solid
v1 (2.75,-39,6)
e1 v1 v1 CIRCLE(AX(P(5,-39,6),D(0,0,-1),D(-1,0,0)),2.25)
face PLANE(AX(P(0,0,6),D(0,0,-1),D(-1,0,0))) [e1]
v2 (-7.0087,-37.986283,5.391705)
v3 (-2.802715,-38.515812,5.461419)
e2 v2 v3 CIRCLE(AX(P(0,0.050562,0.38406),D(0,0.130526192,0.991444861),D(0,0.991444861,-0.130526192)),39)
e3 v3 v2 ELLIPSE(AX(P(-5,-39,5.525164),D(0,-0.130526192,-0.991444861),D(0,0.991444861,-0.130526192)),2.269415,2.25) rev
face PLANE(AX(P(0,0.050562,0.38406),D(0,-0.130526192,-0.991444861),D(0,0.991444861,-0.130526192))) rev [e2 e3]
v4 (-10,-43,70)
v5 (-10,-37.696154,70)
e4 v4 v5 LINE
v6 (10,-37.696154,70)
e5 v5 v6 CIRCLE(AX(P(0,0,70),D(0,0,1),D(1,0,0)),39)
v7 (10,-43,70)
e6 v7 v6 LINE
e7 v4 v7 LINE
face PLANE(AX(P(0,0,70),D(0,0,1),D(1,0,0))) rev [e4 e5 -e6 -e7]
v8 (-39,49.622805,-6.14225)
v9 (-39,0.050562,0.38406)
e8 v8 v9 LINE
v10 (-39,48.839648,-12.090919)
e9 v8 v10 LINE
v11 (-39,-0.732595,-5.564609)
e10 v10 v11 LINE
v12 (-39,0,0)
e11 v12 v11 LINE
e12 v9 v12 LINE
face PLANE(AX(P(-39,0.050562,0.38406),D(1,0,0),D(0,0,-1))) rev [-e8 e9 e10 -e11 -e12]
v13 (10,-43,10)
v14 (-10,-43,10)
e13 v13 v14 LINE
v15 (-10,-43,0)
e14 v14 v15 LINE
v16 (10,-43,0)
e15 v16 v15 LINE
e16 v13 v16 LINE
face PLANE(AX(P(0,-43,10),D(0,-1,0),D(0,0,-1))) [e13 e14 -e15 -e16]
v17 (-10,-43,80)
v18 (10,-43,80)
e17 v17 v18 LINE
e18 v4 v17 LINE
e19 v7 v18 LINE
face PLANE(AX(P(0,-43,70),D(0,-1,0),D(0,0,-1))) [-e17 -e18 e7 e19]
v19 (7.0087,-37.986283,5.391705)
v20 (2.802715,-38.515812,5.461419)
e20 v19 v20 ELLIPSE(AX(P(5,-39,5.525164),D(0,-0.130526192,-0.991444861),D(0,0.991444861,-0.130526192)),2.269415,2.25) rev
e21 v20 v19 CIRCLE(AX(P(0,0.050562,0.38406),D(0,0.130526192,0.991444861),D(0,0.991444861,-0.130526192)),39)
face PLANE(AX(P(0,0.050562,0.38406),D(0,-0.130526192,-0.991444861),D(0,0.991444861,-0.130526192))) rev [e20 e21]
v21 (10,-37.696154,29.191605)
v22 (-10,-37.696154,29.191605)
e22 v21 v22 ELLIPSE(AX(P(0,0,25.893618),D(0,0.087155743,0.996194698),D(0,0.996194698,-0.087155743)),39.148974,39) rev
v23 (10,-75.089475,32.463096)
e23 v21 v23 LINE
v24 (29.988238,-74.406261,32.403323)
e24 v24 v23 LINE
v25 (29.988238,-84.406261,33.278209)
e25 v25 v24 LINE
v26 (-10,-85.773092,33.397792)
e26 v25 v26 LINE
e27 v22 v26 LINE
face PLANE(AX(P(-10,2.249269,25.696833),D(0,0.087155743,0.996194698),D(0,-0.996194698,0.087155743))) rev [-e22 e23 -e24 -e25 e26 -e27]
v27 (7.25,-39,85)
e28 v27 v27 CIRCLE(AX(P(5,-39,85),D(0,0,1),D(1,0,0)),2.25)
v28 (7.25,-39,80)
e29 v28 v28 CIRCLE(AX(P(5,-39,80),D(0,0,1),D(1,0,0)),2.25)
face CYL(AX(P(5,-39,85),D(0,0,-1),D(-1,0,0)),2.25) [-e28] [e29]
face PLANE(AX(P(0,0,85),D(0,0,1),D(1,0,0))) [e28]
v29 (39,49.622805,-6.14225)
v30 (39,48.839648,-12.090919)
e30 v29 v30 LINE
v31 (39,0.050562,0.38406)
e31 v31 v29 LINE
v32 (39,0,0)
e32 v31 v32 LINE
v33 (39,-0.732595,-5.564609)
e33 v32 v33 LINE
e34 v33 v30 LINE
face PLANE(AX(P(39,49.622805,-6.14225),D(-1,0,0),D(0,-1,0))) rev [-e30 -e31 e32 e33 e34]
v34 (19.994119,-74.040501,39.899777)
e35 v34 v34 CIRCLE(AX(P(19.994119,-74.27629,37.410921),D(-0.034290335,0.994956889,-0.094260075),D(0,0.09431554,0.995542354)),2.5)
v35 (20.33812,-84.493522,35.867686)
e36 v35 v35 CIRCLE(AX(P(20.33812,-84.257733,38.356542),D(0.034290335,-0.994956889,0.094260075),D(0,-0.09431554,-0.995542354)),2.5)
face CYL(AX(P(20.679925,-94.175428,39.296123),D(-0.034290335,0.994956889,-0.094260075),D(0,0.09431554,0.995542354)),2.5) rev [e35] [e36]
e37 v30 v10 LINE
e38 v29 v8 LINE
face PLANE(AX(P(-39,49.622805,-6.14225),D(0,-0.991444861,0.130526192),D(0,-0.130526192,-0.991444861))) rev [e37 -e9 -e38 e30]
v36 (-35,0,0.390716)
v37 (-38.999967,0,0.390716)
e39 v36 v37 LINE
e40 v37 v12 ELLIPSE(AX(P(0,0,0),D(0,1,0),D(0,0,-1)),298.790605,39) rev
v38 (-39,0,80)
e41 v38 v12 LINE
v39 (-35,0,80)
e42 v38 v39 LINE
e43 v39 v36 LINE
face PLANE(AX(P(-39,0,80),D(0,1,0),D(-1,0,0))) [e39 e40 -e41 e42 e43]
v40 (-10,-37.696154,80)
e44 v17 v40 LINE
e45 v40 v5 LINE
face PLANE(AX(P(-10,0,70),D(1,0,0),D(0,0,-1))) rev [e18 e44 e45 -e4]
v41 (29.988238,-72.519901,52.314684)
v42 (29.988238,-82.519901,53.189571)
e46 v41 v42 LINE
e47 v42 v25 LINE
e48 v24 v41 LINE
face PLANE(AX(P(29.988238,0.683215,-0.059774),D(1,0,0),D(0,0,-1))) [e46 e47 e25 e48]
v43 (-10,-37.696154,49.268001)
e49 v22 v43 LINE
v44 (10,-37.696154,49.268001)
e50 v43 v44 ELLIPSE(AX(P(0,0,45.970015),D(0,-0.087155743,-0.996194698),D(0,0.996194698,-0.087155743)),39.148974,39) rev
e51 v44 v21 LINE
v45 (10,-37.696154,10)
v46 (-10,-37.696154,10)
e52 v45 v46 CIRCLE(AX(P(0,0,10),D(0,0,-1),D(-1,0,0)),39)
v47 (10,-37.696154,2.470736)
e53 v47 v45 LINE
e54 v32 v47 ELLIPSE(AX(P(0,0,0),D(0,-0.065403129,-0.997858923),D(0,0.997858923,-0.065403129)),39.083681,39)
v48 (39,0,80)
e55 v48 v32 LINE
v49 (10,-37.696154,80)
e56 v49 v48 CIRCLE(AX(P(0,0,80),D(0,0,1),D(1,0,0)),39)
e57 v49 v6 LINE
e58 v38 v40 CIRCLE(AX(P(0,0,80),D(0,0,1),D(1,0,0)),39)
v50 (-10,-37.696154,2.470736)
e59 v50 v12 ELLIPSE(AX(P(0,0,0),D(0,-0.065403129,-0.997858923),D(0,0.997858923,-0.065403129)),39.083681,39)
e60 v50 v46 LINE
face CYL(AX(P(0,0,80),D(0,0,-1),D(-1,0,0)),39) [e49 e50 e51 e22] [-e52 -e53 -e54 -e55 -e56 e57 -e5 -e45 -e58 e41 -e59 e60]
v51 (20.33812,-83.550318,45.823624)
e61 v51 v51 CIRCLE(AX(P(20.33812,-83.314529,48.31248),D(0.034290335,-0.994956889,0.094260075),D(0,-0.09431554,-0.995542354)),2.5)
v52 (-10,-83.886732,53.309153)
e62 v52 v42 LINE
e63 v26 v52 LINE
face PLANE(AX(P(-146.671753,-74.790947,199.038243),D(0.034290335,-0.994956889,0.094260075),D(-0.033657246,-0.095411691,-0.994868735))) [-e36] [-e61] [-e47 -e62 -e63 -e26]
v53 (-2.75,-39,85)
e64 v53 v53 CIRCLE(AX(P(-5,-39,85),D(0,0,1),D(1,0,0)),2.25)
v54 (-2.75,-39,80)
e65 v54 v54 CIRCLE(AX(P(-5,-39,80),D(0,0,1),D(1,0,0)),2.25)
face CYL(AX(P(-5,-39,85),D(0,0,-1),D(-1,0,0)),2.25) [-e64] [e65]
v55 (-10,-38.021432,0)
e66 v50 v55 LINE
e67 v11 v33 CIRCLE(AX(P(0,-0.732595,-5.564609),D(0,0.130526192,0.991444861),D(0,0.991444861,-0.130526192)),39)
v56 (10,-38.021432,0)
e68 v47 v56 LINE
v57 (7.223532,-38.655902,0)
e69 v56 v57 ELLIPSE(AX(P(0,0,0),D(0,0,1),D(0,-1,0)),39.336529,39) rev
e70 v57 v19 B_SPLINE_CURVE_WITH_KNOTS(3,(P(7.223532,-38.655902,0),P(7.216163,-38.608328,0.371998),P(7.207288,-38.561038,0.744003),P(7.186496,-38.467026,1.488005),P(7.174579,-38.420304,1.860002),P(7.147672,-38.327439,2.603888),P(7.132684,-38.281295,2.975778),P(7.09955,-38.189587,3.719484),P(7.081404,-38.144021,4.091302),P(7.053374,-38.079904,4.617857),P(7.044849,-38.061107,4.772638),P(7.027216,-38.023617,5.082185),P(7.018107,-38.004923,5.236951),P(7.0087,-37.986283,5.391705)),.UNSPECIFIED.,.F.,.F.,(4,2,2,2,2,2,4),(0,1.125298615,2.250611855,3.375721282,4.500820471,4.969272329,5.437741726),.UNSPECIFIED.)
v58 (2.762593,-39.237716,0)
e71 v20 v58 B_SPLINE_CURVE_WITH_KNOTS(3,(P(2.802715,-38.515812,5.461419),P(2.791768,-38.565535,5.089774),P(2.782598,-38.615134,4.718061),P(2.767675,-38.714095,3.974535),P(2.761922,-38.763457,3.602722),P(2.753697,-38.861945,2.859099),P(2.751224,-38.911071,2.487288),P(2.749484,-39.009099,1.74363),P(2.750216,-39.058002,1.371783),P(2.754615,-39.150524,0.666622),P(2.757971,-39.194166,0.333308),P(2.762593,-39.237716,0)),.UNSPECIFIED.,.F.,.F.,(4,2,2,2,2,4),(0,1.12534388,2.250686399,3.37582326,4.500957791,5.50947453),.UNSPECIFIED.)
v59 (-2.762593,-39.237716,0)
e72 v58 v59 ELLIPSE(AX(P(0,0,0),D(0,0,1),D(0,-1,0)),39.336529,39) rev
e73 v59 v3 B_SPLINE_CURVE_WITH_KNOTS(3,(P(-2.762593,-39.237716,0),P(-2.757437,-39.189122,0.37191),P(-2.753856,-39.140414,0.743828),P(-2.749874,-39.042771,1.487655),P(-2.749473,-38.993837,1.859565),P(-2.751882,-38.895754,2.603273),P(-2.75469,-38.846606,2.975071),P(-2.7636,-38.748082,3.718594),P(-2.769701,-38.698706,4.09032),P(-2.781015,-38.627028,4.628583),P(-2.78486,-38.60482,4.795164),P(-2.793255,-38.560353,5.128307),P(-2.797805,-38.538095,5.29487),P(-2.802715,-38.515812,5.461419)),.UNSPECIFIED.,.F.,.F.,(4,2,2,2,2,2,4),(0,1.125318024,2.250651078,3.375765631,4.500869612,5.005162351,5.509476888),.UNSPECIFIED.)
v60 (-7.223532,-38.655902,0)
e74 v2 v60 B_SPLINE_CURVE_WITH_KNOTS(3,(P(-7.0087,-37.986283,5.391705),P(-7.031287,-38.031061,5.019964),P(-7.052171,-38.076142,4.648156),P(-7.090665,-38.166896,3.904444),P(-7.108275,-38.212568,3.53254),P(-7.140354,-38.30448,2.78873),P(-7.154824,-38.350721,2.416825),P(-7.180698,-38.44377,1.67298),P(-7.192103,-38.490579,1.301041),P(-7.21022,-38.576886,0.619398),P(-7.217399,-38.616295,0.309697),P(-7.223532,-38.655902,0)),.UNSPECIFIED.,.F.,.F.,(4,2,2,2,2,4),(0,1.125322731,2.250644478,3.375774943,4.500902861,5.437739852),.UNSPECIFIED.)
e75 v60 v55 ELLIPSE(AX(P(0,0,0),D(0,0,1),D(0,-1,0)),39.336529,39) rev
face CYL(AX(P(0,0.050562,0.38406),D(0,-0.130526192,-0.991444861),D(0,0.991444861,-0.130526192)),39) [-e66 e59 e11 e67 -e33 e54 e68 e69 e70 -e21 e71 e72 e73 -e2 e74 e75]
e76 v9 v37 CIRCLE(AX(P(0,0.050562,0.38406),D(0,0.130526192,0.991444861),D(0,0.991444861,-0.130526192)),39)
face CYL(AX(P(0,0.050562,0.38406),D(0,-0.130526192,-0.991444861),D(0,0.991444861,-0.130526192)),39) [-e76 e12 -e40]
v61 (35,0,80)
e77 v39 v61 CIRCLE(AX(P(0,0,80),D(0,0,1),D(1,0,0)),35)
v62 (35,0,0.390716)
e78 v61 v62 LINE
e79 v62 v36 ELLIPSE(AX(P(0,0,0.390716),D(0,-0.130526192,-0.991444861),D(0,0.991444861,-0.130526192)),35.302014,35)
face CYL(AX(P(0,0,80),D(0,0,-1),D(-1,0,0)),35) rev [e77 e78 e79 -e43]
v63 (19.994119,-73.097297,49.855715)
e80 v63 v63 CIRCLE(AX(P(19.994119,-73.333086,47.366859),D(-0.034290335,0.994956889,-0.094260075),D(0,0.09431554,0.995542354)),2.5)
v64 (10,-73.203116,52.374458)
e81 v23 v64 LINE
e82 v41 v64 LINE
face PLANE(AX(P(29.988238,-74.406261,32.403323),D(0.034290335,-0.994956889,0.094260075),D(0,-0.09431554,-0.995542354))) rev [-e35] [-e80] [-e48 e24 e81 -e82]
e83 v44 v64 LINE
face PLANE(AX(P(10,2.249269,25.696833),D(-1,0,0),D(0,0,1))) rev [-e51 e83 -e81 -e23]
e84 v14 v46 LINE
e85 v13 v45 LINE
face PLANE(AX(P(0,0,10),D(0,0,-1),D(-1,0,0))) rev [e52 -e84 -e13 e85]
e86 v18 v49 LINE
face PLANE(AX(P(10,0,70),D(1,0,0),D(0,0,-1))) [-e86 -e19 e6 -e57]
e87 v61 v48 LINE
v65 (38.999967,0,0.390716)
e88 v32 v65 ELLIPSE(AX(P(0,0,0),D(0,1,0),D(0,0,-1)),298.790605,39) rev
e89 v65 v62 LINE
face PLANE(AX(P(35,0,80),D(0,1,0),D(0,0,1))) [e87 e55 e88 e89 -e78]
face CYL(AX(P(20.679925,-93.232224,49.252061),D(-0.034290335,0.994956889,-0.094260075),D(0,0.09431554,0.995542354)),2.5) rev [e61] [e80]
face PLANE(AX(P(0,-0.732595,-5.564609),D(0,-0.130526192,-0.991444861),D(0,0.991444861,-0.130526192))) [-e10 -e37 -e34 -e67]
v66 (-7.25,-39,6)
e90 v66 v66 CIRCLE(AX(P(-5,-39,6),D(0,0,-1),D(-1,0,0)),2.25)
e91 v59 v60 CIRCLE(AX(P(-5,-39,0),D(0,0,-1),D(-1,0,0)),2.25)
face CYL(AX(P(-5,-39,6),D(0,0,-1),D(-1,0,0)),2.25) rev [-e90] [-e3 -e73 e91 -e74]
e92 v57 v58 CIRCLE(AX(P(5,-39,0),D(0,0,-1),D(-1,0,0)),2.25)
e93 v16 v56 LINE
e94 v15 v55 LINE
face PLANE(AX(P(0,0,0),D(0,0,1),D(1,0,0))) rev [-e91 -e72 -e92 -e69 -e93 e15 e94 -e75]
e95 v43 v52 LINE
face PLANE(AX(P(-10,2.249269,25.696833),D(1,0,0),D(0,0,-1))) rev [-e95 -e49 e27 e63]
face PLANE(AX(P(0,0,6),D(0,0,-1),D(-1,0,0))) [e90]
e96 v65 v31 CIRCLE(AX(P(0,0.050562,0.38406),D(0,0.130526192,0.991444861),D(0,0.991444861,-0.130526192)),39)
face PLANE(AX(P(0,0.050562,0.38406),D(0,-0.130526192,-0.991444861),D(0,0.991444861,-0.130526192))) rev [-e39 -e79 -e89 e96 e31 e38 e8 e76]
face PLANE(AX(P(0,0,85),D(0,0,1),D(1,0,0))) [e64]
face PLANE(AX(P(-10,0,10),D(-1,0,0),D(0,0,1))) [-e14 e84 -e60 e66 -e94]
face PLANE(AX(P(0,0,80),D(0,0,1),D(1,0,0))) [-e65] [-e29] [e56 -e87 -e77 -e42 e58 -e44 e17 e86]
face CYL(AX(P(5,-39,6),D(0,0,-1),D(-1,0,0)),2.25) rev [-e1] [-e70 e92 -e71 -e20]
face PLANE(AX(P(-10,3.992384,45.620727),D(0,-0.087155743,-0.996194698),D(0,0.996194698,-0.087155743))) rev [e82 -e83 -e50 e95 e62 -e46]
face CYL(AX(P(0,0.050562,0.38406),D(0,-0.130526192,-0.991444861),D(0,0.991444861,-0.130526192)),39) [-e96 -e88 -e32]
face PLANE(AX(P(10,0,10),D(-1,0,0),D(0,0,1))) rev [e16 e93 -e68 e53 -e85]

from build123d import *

# Parameters (mm, degrees)
EXTRUDE_THIN1_DEPTH       = 80
BOSS_EXTRUDE1_START       = -10
BOSS_EXTRUDE1_DEPTH       = 10
SKETCH3_R                 = 2.25
BOSS_EXTRUDE2_DEPTH       = 5
BOSS_EXTRUDE3_DEPTH       = 10
SKETCH5_R                 = 2.25
CUT_EXTRUDE1_DEPTH        = 6
BOSS_EXTRUDE4_REACH       = 104.415
BOSS_EXTRUDE4_END_RADIUS  = 39
SKETCH10_W                = 20
SKETCH10_H                = 20
BOSS_EXTRUDE6_DEPTH       = 6
BOSS_EXTRUDE7_START       = -38.548677333
BOSS_EXTRUDE7_OUTLINE_W   = 20
BOSS_EXTRUDE7_OUTLINE_H   = 20
BOSS_EXTRUDE7_DEPTH       = 38.548677333
BOSS_EXTRUDE7_START_2     = 88.145703723
BOSS_EXTRUDE7_2_OUTLINE_W = 23
BOSS_EXTRUDE7_2_OUTLINE_H = 23
BOSS_EXTRUDE7_2_DEPTH     = 1.854296277
BOSS_EXTRUDE9_DEPTH       = 20
SKETCH16_R                = 2.5
CUT_EXTRUDE2_DEPTH        = 20


with BuildPart() as part:
    # Sketch1 → Extrude-Thin1 (new body)
    with BuildSketch(Plane.XY):
        with BuildLine():
            ThreePointArc((-35, 0), (0, -35), (35, 0))
            Line((35, 0), (39, 0))
            ThreePointArc((39, 0), (0, -39), (-39, 0))
            Line((-39, 0), (-35, 0))
        make_face()
    extrude(amount=EXTRUDE_THIN1_DEPTH)

    # Sketch2 → Boss-Extrude1 (add)
    with BuildSketch(Plane.XY.offset(80).offset(BOSS_EXTRUDE1_START)):
        with BuildLine():
            Line((0, -39), (0, -35))
            Line((0, -35), (-10, -35))
            Line((-10, -35), (-10, -37.69615365))
            ThreePointArc((-10, -37.69615365), (-5.042321274, -38.672664715), (0, -39))
        make_face()
        with BuildLine():
            Line((10, -35), (0, -35))
            Line((0, -35), (0, -39))
            ThreePointArc((0, -39), (5.042321274, -38.672664715), (10, -37.69615365))
            Line((10, -37.69615365), (10, -35))
        make_face()
        with BuildLine():
            ThreePointArc((10, -37.69615365), (5.042321274, -38.672664715), (0, -39))
            ThreePointArc((0, -39), (-5.042321274, -38.672664715), (-10, -37.69615365))
            Line((-10, -37.69615365), (-10, -43))
            Line((-10, -43), (10, -43))
            Line((10, -43), (10, -37.69615365))
        make_face()
    extrude(amount=BOSS_EXTRUDE1_DEPTH)

    # Sketch3 → Boss-Extrude2 (add)
    with BuildSketch(Plane.XY.offset(80)):
        with Locations((-5, -39)):
            Circle(SKETCH3_R)
        with Locations((5, -39)):
            Circle(SKETCH3_R)
    extrude(amount=BOSS_EXTRUDE2_DEPTH)

    # Sketch4 → Boss-Extrude3 (add)
    with BuildSketch(Plane(origin=(0, 0, 0), x_dir=(-1, 0, 0), z_dir=(0, 0, -1))):
        with BuildLine():
            Line((0, -39), (0, -35))
            Line((0, -35), (-10, -35))
            Line((-10, -35), (-10, -37.69615365))
            ThreePointArc((-10, -37.69615365), (-5.042321274, -38.672664715), (0, -39))
        make_face()
        with BuildLine():
            ThreePointArc((10, -37.69615365), (5.042321274, -38.672664715), (0, -39))
            ThreePointArc((0, -39), (-5.042321274, -38.672664715), (-10, -37.69615365))
            Line((-10, -37.69615365), (-10, -43))
            Line((-10, -43), (10, -43))
            Line((10, -43), (10, -37.69615365))
        make_face()
        with BuildLine():
            Line((10, -35), (0, -35))
            Line((0, -35), (0, -39))
            ThreePointArc((0, -39), (5.042321274, -38.672664715), (10, -37.69615365))
            Line((10, -37.69615365), (10, -35))
        make_face()
    extrude(amount=-BOSS_EXTRUDE3_DEPTH)

    # Sketch5 → Cut-Extrude1 (cut)
    with BuildSketch(Plane(origin=(0, 0, 0), x_dir=(-1, 0, 0), z_dir=(0, 0, -1))):
        with Locations(Location((-5, -39, 0), (0, 0, 180))):
            Circle(SKETCH5_R)
        with Locations(Location((5, -39, 0), (0, 0, 180))):
            Circle(SKETCH5_R)
    extrude(amount=-CUT_EXTRUDE1_DEPTH, mode=Mode.SUBTRACT)

    # Boss-Extrude4: up to this cylinder (the profile starts outside it)
    boss_extrude4_end = Plane(origin=(0, 0, 40), z_dir=(0, 0, -1)) * Cylinder(BOSS_EXTRUDE4_END_RADIUS, 287.83, mode=Mode.PRIVATE)
    # Sketch10 → Boss-Extrude4 (add, up to the surface)
    with BuildSketch(Plane(origin=(0, -49.619293796, 4.341125699), x_dir=(1, 0, 0), z_dir=(0, 0.9961946980917462, -0.08715574274765152)), mode=Mode.PRIVATE) as boss_extrude4_sk1:
        with Locations((0, -35.795085407)):
            Rectangle(SKETCH10_W, SKETCH10_H)
    boss_extrude4_tool1 = extrude(boss_extrude4_sk1.sketch, amount=BOSS_EXTRUDE4_REACH, mode=Mode.PRIVATE) - boss_extrude4_end
    add(boss_extrude4_tool1.solids().sort_by_distance((0, -46.499547, 40))[0])

    # Sketch14 → Boss-Extrude6 (add)
    with BuildSketch(Plane(origin=(0, -0.732594735, -5.56460947), x_dir=(1, 0, 0), z_dir=(0, 0.130526192220045, 0.9914448613738114))):
        with BuildLine():
            Line((-39, 0), (-39, 50))
            Line((-39, 50), (39, 50))
            Line((39, 50), (39, 0))
            ThreePointArc((39, 0), (0, -39), (-39, 0))
        make_face()
    extrude(amount=BOSS_EXTRUDE6_DEPTH)

    # Boss-Extrude7: read off the stored shape, not the designer's step
    # Boss-Extrude7 outline → Boss-Extrude7 (add)
    with BuildSketch(Plane(origin=(0, -49.619293796, 4.341125699), x_dir=(1, 0, 0), z_dir=(0, 0.9961946980917462, -0.08715574274765152)).offset(BOSS_EXTRUDE7_START)):
        with Locations((0, -35.795085407)):
            Rectangle(BOSS_EXTRUDE7_OUTLINE_W, BOSS_EXTRUDE7_OUTLINE_H)
    extrude(amount=BOSS_EXTRUDE7_DEPTH)

    # Boss-Extrude7 2 outline → Boss-Extrude7 2 (cut)
    with BuildSketch(Plane(origin=(0, 0, 0), x_dir=(0.9994119135527714, 0.03413748045727771, -0.003234111441613329), z_dir=(0.0342903346263607, -0.9949568891477218, 0.09426007473315608)).offset(BOSS_EXTRUDE7_START_2)):
        with Locations((-3.5, 35.5)):
            Rectangle(BOSS_EXTRUDE7_2_OUTLINE_W, BOSS_EXTRUDE7_2_OUTLINE_H)
    extrude(amount=BOSS_EXTRUDE7_2_DEPTH, mode=Mode.SUBTRACT)

    # Sketch15 → Boss-Extrude9 (add, along a direction that is not the sketch's normal)
    with BuildSketch(Plane(origin=(10, 0, 0), x_dir=(0, 0, -1), z_dir=(1, 0, 0))):
        Polygon((-53.249344589, -83.203115712), (-33.337982915, -85.089475272), (-32.46309628, -75.089475272), (-52.374457954, -73.203115712), align=None)
    extrude(amount=BOSS_EXTRUDE9_DEPTH, dir=(0.9994118831812419, 0.034160731366783506, -0.0029886767323038838))

    # Sketch16 → Cut-Extrude2 (cut)
    with BuildSketch(Plane(origin=(2.678543813, -77.719732066, 7.363000179), x_dir=(0.9994101830326216, 0.03396190638807467, -0.005086744065644862), z_dir=(-0.03429033462636075, 0.9949568891477218, -0.0942600747331567))):
        with Locations(Location((17.250851161, -40.271437351, 0), (0, 0, 269.893376297))):
            Circle(SKETCH16_R)
        with Locations(Location((17.269461459, -30.270938076, 0), (0, 0, 269.893376297))):
            Circle(SKETCH16_R)
    extrude(amount=-CUT_EXTRUDE2_DEPTH, mode=Mode.SUBTRACT)


solid = part.part
